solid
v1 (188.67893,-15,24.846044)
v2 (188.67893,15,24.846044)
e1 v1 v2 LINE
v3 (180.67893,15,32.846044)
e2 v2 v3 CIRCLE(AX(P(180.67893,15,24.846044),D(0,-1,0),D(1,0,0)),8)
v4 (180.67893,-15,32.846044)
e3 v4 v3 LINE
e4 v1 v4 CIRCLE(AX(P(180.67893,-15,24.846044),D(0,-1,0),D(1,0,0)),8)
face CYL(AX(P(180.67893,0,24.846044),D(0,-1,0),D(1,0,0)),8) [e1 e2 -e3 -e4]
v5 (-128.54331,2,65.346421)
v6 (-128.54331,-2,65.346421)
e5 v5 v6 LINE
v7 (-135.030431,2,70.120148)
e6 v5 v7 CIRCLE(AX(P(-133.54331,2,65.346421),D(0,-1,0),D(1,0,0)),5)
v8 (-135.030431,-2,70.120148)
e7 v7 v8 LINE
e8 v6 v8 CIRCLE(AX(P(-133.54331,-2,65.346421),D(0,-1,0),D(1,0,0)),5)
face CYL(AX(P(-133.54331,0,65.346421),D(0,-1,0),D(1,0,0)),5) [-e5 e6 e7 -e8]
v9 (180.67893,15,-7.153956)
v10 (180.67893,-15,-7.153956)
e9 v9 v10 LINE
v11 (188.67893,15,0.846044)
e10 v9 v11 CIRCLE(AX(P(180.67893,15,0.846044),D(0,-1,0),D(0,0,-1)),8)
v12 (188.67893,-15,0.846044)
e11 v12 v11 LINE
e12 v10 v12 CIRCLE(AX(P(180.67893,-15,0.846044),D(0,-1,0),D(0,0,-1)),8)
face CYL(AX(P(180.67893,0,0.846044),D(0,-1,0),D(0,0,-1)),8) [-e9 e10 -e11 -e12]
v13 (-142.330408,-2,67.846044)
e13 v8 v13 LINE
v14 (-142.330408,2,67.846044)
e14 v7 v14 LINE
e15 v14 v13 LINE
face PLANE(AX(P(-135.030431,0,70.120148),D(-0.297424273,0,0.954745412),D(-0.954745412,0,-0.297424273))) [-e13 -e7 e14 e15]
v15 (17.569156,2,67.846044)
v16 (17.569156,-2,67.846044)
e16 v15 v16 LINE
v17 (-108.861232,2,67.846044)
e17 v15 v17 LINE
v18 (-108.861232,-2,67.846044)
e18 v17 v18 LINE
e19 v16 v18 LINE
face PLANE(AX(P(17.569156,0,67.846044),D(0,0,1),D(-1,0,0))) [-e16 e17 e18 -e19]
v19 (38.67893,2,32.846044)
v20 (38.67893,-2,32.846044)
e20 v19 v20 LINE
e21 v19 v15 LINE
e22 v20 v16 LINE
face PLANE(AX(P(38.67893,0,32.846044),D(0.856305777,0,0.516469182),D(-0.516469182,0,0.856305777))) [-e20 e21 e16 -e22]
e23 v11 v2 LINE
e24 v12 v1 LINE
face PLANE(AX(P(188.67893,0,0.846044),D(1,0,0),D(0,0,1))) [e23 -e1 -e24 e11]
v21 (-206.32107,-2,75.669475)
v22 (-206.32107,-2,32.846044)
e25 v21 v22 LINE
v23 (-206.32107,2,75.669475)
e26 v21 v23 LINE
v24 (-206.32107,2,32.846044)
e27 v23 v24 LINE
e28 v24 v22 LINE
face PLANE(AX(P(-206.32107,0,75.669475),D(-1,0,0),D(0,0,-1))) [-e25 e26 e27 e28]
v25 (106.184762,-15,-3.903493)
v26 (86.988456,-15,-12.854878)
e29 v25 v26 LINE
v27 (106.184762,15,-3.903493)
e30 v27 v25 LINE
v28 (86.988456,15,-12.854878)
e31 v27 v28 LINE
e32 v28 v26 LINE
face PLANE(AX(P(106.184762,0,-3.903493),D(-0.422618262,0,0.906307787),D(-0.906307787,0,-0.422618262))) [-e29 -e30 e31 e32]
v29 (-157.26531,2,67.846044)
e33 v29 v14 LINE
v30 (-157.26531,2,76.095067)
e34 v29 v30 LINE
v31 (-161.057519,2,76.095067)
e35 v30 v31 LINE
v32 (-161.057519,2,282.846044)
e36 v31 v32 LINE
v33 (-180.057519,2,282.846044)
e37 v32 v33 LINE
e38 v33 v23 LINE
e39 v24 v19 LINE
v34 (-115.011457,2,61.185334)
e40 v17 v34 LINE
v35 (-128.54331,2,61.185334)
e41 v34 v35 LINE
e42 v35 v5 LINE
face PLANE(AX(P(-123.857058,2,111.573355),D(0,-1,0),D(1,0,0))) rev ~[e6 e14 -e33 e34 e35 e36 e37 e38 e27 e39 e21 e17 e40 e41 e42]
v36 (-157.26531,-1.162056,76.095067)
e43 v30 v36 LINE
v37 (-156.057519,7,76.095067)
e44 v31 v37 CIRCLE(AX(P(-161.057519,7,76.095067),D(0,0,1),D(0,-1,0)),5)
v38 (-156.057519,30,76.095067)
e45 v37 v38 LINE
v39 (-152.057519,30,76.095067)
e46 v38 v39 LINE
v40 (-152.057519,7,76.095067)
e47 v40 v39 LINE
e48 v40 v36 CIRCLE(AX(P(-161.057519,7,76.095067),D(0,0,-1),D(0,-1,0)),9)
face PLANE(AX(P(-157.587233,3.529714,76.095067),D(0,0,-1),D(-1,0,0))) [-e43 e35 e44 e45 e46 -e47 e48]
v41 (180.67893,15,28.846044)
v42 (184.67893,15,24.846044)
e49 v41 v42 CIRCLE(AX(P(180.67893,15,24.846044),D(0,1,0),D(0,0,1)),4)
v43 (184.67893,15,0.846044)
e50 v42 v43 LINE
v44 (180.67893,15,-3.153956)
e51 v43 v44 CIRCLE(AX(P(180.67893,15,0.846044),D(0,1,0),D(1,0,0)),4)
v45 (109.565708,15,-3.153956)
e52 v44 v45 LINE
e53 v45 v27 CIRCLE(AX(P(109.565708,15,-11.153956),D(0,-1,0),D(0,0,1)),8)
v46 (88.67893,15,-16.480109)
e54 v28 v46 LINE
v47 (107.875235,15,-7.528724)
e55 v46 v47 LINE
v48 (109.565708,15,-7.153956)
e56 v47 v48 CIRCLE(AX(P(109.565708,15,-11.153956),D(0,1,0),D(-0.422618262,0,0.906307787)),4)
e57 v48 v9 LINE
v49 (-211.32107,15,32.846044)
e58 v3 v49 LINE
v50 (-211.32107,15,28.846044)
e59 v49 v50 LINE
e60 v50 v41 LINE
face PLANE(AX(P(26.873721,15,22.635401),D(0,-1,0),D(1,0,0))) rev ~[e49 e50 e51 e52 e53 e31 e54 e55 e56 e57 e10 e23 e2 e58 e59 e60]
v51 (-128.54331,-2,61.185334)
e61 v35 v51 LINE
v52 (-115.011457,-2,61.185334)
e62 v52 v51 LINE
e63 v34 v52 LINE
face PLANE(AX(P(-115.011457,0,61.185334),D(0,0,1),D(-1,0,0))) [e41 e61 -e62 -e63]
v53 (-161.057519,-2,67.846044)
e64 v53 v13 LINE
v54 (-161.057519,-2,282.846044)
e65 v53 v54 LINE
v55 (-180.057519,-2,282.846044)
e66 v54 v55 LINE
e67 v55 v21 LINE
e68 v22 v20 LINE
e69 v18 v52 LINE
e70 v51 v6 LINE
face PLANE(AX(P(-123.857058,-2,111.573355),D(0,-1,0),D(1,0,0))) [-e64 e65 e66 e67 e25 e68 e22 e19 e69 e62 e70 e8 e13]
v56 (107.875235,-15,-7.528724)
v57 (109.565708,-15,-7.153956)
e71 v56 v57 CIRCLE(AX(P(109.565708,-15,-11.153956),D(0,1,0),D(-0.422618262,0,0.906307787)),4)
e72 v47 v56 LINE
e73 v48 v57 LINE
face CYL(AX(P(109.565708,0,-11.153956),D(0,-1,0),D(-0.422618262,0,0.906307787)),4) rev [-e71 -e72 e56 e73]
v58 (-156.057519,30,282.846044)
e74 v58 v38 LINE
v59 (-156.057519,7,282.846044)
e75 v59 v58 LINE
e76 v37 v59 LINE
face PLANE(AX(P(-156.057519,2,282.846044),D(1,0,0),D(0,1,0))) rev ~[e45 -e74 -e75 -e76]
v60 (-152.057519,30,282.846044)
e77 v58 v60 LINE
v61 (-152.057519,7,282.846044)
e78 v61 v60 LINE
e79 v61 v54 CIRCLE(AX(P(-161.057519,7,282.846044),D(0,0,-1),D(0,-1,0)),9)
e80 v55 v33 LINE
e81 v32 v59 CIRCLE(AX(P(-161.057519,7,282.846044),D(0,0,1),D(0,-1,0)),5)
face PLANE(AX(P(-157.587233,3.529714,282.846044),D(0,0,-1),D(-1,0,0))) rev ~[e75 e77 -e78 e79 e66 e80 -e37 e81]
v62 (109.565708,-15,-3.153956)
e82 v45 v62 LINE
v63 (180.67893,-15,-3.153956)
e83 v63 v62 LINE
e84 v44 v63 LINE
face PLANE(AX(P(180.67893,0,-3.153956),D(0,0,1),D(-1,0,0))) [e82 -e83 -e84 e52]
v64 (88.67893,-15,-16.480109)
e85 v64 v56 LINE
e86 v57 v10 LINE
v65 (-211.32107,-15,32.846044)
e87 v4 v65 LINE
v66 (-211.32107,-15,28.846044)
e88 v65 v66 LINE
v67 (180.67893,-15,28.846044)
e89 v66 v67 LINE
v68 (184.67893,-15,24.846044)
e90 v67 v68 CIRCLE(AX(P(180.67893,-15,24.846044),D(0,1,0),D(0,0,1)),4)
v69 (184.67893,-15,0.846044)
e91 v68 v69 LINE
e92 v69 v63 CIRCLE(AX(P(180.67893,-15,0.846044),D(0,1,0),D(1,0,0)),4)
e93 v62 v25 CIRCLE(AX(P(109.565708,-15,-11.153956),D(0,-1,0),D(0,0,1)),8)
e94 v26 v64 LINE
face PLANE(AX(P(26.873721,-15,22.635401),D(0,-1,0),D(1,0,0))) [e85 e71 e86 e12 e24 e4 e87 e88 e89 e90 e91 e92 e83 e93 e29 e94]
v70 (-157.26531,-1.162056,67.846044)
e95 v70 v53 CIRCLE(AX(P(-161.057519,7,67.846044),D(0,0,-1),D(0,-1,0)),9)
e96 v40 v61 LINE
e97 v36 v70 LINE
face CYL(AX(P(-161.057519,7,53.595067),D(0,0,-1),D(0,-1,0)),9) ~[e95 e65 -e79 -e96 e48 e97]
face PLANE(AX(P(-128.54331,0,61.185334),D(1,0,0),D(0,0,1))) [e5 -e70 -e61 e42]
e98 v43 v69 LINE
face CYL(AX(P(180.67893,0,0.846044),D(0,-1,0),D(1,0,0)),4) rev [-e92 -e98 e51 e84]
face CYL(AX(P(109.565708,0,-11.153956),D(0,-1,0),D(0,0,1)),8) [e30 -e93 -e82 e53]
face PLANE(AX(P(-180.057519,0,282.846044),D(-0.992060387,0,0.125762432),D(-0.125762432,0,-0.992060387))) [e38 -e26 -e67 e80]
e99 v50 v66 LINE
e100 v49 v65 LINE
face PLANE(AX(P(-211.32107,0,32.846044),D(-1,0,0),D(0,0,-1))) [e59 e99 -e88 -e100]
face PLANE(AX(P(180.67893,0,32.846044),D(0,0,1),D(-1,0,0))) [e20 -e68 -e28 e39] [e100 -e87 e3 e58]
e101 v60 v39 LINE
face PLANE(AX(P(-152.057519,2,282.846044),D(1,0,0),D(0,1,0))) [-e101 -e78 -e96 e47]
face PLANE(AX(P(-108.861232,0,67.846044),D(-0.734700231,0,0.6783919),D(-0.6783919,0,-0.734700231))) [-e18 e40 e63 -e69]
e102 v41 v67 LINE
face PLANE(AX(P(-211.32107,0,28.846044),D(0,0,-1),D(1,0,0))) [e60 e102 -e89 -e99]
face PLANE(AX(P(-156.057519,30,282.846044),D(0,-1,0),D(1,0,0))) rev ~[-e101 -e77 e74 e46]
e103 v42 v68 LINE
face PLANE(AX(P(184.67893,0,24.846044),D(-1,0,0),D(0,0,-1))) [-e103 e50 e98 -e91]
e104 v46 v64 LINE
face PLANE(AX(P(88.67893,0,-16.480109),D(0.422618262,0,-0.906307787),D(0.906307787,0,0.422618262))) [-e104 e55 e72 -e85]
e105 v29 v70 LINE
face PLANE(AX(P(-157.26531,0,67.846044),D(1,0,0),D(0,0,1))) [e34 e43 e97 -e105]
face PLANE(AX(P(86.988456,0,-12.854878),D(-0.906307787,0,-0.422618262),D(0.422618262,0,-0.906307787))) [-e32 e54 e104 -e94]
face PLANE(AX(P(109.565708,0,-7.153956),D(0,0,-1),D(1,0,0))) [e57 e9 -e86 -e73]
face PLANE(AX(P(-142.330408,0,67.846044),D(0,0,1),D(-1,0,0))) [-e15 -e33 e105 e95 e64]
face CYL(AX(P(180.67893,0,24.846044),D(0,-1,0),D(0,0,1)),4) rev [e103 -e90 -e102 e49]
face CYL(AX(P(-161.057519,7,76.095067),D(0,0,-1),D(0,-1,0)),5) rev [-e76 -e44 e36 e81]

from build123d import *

# Parameters (mm, degrees)
F1_DEPTH    = 15
F3_DEPTH    = 2
F4_W        = 4
F4_H        = 28
F5_DEPTH    = 206.7509774754
F6_T1_DEPTH = 206.7509774754
F7_T4_DEPTH = 251.7509774754


# Not quite as in the source:
# - a fillet or chamfer that OpenCascade refuses, or shapes differently, is made with other operations: its cross-section is extruded or revolved along the edge and cut away or added


with BuildPart() as f1:
    # F0 (on Front) → F1 (new body, symmetric)
    with BuildSketch(Plane.XZ):
        with BuildLine():
            Line((180.6789295077, 32.8460444401), (-211.3210704923, 32.8460444401))
            Line((-211.3210704923, 32.8460444401), (-211.3210704923, 28.8460444401))
            Line((-211.3210704923, 28.8460444401), (180.6789295077, 28.8460444401))
            ThreePointArc((180.6789295077, 28.8460444401), (183.5073566325, 27.6744715648), (184.6789295077, 24.8460444401))
            Line((184.6789295077, 24.8460444401), (184.6789295077, 0.8460444401))
            ThreePointArc((184.6789295077, 0.8460444401), (183.5073566325, -1.9823826847), (180.6789295077, -3.1539555599))
            Line((180.6789295077, -3.1539555599), (109.5657081583, -3.1539555599))
            ThreePointArc((109.5657081583, -3.1539555599), (107.8341912468, -3.343587503), (106.1847620644, -3.9034932637))
            Line((106.1847620644, -3.9034932637), (86.9884564608, -12.8548775749))
            Line((86.9884564608, -12.8548775749), (88.6789295077, -16.480108723))
            Line((88.6789295077, -16.480108723), (107.8752351113, -7.5287244118))
            ThreePointArc((107.8752351113, -7.5287244118), (108.6999497026, -7.2487715315), (109.5657081583, -7.1539555599))
            Line((109.5657081583, -7.1539555599), (180.6789295077, -7.1539555599))
            ThreePointArc((180.6789295077, -7.1539555599), (186.3357837572, -4.8108098094), (188.6789295077, 0.8460444401))
            Line((188.6789295077, 0.8460444401), (188.6789295077, 24.8460444401))
            ThreePointArc((188.6789295077, 24.8460444401), (186.3357837572, 30.5028986895), (180.6789295077, 32.8460444401))
        make_face()
    extrude(amount=F1_DEPTH, both=True)

    # F2 (on Front) → F3 (join, symmetric)
    with BuildSketch(Plane.XZ):
        with BuildLine():
            Line((-206.3210704923, 75.6694748998), (-206.3210704923, 32.8460444401))
            Line((-206.3210704923, 32.8460444401), (38.6789295077, 32.8460444401))
            Line((38.6789295077, 32.8460444401), (17.569155556, 67.8460444401))
            Line((17.569155556, 67.8460444401), (-108.8612323146, 67.8460444401))
            Line((-108.8612323146, 67.8460444401), (-115.0114574584, 61.1853342652))
            Line((-115.0114574584, 61.1853342652), (-128.5433099752, 61.1853342652))
            Line((-128.5433099752, 61.1853342652), (-128.5433099752, 65.3464212941))
            ThreePointArc((-128.5433099752, 65.3464212941), (-130.579832864, 69.3735546928), (-135.0304313397, 70.1201483545))
            Line((-135.0304313397, 70.1201483545), (-142.3304080963, 67.8460444401))
            Line((-142.3304080963, 67.8460444401), (-157.2653103035, 67.8460444401))
            Line((-157.2653103035, 67.8460444401), (-157.2653103035, 76.0950669646))
            Line((-157.2653103035, 76.0950669646), (-152.0575187367, 76.0950669646))
            Line((-152.0575187367, 76.0950669646), (-152.0575187367, 282.8460444401))
            Line((-152.0575187367, 282.8460444401), (-180.0575187367, 282.8460444401))
            Line((-180.0575187367, 282.8460444401), (-206.3210704923, 75.6694748998))
        make_face()
    extrude(amount=F3_DEPTH, both=True)

    # F4 (on face) → F5 (join, through all)
    with BuildSketch(Plane.XY.offset(282.8460444401)):
        with Locations((-154.0575187367, 16)):
            Rectangle(F4_W, F4_H)
    extrude(amount=-F5_DEPTH)

    # F6: fillet of radius 5 on 1 edges, made by hand

    # F6_s2 → F6_t1 (join)
    with BuildSketch(Plane.XY.offset(76.0950669646)):
        with BuildLine():
            ThreePointArc((-161.0575187367, 2), (-157.5219848308, 3.4644660941), (-156.0575187367, 7))
            Line((-156.0575187367, 7), (-156.0575187367, 2))
            Line((-156.0575187367, 2), (-161.0575187367, 2))
        make_face()
    extrude(amount=F6_T1_DEPTH)

    # F7: fillet of radius 9 on 1 edges, made by hand


with BuildPart() as f7_tool2:
    # F7_s3 → F7_t4 (new body)
    with BuildSketch(Plane.XY.offset(53.5950669646)):
        with BuildLine():
            ThreePointArc((-161.0575187367, -2), (-154.6935577061, 0.6360389693), (-152.0575187367, 7))
            Line((-152.0575187367, 7), (-152.0575187367, -2))
            Line((-152.0575187367, -2), (-161.0575187367, -2))
        make_face()
    extrude(amount=F7_T4_DEPTH)

    split(bisect_by=Plane.XY.offset(67.8460444401), keep=Keep.TOP)


with BuildPart() as f1_1:
    add(f1.part)

    # F7_t1: cut F7_tool2
    add(f7_tool2.part, mode=Mode.SUBTRACT)


solid = f1_1.part
